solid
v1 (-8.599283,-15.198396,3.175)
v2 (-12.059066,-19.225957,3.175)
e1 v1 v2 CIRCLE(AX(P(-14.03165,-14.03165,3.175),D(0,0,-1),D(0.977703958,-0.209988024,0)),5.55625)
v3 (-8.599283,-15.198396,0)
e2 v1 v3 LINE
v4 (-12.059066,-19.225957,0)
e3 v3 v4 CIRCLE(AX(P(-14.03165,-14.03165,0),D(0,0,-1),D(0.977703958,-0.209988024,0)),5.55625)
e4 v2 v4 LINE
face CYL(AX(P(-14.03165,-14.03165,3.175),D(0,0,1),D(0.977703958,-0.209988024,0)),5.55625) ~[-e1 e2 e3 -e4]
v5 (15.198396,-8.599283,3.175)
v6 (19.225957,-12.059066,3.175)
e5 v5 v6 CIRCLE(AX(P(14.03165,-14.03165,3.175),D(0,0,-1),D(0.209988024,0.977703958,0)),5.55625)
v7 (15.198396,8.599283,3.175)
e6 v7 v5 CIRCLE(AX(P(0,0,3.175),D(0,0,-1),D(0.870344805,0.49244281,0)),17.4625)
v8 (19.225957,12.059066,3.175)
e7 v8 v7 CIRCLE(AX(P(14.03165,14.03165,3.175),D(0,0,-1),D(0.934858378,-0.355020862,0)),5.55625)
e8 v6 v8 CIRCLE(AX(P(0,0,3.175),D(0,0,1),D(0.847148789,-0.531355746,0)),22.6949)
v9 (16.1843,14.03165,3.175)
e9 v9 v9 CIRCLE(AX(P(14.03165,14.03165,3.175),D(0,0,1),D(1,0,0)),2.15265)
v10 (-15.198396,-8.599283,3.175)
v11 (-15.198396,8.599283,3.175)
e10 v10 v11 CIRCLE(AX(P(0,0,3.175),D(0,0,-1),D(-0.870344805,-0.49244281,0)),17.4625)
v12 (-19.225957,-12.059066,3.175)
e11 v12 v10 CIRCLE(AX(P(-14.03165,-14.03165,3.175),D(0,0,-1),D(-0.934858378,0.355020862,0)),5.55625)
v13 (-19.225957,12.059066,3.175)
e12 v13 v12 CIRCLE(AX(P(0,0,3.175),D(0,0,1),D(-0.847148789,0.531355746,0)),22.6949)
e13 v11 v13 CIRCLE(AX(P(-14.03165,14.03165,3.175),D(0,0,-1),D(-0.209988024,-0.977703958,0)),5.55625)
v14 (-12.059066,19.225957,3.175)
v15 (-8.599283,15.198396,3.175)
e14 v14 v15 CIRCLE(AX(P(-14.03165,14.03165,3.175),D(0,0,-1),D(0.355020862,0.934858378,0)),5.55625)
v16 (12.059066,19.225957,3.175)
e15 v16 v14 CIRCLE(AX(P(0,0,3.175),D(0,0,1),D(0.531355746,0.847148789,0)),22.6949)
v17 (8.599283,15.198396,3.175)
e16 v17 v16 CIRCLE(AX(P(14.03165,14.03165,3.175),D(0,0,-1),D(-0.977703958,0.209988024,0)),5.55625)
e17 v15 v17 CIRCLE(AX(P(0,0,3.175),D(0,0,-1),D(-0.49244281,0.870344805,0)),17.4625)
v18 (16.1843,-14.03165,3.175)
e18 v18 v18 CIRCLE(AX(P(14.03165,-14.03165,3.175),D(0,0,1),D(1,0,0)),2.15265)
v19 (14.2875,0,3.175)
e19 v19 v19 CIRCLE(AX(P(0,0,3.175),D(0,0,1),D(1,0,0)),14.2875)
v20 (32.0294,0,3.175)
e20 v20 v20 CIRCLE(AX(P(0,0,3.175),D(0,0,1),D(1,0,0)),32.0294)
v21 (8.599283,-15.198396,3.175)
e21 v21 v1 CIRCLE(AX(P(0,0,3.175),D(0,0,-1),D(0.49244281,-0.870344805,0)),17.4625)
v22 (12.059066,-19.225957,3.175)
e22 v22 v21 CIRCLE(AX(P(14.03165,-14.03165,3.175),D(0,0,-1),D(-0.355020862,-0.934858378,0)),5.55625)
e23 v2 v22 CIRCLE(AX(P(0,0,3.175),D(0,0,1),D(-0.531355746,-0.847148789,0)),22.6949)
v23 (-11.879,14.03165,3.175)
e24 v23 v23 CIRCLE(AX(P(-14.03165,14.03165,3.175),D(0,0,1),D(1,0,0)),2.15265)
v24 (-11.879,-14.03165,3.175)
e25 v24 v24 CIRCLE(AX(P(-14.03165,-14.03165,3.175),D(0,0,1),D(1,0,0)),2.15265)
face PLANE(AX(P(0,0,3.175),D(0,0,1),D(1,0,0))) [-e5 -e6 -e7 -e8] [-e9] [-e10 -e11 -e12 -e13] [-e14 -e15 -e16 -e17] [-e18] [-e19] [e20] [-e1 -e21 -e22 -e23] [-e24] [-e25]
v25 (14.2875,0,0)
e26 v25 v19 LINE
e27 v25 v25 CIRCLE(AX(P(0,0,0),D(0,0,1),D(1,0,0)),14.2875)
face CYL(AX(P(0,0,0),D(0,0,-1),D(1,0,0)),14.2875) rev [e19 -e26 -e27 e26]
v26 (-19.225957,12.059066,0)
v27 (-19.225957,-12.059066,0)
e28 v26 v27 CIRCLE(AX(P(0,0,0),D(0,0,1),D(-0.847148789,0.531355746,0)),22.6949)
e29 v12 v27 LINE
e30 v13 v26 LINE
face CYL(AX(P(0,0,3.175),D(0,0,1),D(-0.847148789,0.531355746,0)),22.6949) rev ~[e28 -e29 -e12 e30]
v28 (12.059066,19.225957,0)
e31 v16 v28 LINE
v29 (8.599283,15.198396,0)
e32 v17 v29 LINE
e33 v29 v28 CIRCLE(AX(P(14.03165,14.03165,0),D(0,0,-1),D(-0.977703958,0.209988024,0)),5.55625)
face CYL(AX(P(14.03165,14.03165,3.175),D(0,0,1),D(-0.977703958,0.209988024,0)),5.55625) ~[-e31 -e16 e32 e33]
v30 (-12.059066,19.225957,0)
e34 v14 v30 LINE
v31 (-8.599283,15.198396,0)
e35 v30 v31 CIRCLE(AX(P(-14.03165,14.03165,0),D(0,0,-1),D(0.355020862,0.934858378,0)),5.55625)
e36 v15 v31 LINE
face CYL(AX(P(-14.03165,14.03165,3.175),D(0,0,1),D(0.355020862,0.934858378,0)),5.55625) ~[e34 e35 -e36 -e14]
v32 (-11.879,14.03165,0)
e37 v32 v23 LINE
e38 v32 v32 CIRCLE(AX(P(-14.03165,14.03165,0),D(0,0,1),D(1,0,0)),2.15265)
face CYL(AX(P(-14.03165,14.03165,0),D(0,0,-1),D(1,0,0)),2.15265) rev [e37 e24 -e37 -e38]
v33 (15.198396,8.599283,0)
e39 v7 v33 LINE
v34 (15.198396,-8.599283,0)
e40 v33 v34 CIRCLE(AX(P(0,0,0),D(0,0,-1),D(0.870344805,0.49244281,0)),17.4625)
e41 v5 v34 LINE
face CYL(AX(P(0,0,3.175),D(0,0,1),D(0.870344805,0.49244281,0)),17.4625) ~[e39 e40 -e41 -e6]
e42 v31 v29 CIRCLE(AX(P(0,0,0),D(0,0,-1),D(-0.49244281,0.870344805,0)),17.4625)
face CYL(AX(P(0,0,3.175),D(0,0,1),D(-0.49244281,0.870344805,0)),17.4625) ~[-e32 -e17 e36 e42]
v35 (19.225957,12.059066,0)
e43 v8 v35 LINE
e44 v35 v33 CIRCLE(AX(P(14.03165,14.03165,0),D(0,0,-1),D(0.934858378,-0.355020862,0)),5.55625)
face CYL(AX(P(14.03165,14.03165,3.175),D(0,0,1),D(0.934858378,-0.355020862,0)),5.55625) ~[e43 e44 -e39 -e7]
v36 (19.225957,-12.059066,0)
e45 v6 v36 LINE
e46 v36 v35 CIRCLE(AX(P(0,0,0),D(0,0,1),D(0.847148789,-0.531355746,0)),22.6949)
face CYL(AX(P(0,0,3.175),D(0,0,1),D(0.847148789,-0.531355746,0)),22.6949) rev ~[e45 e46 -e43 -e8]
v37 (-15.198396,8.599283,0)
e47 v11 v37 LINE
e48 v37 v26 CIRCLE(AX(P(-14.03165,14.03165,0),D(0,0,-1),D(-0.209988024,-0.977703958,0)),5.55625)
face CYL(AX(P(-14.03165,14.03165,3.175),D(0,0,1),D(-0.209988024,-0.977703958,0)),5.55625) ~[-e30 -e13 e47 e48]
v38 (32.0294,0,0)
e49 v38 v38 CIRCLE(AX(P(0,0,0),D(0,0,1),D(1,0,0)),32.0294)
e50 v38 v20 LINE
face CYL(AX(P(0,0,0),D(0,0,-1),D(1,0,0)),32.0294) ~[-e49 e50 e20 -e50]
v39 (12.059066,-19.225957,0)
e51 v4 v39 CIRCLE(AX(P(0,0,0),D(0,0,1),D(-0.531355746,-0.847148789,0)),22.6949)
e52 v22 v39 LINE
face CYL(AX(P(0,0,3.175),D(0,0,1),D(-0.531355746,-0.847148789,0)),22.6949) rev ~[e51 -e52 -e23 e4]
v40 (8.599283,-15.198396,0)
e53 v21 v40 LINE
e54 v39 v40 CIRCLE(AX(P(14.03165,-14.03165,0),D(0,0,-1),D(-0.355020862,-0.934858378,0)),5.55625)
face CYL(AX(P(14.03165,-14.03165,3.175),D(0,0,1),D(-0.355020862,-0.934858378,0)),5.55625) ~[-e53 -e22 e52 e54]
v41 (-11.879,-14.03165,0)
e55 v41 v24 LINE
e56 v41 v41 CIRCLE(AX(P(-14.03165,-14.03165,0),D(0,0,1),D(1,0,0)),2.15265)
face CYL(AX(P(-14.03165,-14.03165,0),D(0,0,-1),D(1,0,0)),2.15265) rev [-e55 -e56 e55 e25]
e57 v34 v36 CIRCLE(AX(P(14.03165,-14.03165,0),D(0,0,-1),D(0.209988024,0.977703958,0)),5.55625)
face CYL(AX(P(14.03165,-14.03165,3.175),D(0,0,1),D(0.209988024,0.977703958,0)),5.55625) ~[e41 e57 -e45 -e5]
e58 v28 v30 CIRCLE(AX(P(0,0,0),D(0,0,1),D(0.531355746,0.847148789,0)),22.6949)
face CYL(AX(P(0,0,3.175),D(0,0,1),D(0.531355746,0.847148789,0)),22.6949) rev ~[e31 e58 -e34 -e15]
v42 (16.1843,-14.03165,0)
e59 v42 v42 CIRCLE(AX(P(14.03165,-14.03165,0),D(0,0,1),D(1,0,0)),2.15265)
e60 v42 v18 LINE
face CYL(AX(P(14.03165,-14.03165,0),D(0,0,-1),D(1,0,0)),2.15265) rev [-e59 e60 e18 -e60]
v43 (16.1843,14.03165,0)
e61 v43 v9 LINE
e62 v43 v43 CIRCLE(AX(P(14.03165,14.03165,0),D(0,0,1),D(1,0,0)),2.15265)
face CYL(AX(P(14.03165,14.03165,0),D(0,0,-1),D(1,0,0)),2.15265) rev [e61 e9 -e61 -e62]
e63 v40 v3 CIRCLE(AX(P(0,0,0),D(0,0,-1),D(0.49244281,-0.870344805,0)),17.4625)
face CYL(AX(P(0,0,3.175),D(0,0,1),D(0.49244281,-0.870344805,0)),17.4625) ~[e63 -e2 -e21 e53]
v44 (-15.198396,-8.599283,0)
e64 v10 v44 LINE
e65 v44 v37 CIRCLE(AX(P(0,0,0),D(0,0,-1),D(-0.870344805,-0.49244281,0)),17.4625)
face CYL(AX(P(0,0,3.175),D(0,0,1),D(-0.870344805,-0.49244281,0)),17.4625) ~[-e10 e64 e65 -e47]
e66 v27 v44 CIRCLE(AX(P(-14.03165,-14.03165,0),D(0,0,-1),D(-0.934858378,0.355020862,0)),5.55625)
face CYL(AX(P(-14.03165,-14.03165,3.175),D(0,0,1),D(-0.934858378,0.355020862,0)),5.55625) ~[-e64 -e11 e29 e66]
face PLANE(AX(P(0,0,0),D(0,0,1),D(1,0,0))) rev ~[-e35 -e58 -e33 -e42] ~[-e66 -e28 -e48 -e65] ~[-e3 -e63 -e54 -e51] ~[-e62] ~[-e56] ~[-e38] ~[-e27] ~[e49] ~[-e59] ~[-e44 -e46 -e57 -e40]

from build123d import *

# Parameters (mm, degrees)
F0_R            = 32.0294
F0_R_2          = 2.15265
F0_R_3          = 14.2875
F1_DEPTH        = 3.175
F3_DEPTH        = 3.175
F3_COPIES_COUNT = 4


# Not quite as in the source:
# - a pattern or mirror of a feature is missing from the dataset's text; its kind, count and spacing are read off the source's solid


with BuildPart() as f1:
    # F0 (on Top) → F1 (new body)
    with BuildSketch(Plane.XY):
        Circle(F0_R)
        with Locations((-14.0316501892, -14.0316501892)):
            Circle(F0_R_2, mode=Mode.SUBTRACT)
        with Locations((14.0316501892, -14.0316501892)):
            Circle(F0_R_2, mode=Mode.SUBTRACT)
        with Locations((-14.0316501892, 14.0316501892)):
            Circle(F0_R_2, mode=Mode.SUBTRACT)
        Circle(F0_R_3, mode=Mode.SUBTRACT)
        with Locations((14.0316501892, 14.0316501892)):
            Circle(F0_R_2, mode=Mode.SUBTRACT)
    extrude(amount=F1_DEPTH)

    # F2 (on face) → F3 (cut, through all)
    with BuildSketch(Plane.XY.offset(3.175)):
        with BuildLine():
            ThreePointArc((-12.0590655259, 19.2259570543), (-9.8169566913, 17.6521850643), (-8.599282572, 15.1983961488))
            ThreePointArc((-8.599282572, 15.1983961488), (0, 17.4625), (8.599282572, 15.1983961488))
            ThreePointArc((8.599282572, 15.1983961488), (9.8169566913, 17.6521850643), (12.0590655259, 19.2259570543))
            ThreePointArc((12.0590655259, 19.2259570543), (0, 22.6949), (-12.0590655259, 19.2259570543))
        make_face()
    f3 = extrude(amount=-F3_DEPTH, mode=Mode.SUBTRACT)

    # F3_copies: F3 ×4 about axis
    f3_copies_axis = Axis((0, 0, 0), (0, 0, 1))
    for i in range(1, F3_COPIES_COUNT):
        add(f3.rotate(f3_copies_axis, i * 360 / F3_COPIES_COUNT), mode=Mode.SUBTRACT)


solid = f1.part
